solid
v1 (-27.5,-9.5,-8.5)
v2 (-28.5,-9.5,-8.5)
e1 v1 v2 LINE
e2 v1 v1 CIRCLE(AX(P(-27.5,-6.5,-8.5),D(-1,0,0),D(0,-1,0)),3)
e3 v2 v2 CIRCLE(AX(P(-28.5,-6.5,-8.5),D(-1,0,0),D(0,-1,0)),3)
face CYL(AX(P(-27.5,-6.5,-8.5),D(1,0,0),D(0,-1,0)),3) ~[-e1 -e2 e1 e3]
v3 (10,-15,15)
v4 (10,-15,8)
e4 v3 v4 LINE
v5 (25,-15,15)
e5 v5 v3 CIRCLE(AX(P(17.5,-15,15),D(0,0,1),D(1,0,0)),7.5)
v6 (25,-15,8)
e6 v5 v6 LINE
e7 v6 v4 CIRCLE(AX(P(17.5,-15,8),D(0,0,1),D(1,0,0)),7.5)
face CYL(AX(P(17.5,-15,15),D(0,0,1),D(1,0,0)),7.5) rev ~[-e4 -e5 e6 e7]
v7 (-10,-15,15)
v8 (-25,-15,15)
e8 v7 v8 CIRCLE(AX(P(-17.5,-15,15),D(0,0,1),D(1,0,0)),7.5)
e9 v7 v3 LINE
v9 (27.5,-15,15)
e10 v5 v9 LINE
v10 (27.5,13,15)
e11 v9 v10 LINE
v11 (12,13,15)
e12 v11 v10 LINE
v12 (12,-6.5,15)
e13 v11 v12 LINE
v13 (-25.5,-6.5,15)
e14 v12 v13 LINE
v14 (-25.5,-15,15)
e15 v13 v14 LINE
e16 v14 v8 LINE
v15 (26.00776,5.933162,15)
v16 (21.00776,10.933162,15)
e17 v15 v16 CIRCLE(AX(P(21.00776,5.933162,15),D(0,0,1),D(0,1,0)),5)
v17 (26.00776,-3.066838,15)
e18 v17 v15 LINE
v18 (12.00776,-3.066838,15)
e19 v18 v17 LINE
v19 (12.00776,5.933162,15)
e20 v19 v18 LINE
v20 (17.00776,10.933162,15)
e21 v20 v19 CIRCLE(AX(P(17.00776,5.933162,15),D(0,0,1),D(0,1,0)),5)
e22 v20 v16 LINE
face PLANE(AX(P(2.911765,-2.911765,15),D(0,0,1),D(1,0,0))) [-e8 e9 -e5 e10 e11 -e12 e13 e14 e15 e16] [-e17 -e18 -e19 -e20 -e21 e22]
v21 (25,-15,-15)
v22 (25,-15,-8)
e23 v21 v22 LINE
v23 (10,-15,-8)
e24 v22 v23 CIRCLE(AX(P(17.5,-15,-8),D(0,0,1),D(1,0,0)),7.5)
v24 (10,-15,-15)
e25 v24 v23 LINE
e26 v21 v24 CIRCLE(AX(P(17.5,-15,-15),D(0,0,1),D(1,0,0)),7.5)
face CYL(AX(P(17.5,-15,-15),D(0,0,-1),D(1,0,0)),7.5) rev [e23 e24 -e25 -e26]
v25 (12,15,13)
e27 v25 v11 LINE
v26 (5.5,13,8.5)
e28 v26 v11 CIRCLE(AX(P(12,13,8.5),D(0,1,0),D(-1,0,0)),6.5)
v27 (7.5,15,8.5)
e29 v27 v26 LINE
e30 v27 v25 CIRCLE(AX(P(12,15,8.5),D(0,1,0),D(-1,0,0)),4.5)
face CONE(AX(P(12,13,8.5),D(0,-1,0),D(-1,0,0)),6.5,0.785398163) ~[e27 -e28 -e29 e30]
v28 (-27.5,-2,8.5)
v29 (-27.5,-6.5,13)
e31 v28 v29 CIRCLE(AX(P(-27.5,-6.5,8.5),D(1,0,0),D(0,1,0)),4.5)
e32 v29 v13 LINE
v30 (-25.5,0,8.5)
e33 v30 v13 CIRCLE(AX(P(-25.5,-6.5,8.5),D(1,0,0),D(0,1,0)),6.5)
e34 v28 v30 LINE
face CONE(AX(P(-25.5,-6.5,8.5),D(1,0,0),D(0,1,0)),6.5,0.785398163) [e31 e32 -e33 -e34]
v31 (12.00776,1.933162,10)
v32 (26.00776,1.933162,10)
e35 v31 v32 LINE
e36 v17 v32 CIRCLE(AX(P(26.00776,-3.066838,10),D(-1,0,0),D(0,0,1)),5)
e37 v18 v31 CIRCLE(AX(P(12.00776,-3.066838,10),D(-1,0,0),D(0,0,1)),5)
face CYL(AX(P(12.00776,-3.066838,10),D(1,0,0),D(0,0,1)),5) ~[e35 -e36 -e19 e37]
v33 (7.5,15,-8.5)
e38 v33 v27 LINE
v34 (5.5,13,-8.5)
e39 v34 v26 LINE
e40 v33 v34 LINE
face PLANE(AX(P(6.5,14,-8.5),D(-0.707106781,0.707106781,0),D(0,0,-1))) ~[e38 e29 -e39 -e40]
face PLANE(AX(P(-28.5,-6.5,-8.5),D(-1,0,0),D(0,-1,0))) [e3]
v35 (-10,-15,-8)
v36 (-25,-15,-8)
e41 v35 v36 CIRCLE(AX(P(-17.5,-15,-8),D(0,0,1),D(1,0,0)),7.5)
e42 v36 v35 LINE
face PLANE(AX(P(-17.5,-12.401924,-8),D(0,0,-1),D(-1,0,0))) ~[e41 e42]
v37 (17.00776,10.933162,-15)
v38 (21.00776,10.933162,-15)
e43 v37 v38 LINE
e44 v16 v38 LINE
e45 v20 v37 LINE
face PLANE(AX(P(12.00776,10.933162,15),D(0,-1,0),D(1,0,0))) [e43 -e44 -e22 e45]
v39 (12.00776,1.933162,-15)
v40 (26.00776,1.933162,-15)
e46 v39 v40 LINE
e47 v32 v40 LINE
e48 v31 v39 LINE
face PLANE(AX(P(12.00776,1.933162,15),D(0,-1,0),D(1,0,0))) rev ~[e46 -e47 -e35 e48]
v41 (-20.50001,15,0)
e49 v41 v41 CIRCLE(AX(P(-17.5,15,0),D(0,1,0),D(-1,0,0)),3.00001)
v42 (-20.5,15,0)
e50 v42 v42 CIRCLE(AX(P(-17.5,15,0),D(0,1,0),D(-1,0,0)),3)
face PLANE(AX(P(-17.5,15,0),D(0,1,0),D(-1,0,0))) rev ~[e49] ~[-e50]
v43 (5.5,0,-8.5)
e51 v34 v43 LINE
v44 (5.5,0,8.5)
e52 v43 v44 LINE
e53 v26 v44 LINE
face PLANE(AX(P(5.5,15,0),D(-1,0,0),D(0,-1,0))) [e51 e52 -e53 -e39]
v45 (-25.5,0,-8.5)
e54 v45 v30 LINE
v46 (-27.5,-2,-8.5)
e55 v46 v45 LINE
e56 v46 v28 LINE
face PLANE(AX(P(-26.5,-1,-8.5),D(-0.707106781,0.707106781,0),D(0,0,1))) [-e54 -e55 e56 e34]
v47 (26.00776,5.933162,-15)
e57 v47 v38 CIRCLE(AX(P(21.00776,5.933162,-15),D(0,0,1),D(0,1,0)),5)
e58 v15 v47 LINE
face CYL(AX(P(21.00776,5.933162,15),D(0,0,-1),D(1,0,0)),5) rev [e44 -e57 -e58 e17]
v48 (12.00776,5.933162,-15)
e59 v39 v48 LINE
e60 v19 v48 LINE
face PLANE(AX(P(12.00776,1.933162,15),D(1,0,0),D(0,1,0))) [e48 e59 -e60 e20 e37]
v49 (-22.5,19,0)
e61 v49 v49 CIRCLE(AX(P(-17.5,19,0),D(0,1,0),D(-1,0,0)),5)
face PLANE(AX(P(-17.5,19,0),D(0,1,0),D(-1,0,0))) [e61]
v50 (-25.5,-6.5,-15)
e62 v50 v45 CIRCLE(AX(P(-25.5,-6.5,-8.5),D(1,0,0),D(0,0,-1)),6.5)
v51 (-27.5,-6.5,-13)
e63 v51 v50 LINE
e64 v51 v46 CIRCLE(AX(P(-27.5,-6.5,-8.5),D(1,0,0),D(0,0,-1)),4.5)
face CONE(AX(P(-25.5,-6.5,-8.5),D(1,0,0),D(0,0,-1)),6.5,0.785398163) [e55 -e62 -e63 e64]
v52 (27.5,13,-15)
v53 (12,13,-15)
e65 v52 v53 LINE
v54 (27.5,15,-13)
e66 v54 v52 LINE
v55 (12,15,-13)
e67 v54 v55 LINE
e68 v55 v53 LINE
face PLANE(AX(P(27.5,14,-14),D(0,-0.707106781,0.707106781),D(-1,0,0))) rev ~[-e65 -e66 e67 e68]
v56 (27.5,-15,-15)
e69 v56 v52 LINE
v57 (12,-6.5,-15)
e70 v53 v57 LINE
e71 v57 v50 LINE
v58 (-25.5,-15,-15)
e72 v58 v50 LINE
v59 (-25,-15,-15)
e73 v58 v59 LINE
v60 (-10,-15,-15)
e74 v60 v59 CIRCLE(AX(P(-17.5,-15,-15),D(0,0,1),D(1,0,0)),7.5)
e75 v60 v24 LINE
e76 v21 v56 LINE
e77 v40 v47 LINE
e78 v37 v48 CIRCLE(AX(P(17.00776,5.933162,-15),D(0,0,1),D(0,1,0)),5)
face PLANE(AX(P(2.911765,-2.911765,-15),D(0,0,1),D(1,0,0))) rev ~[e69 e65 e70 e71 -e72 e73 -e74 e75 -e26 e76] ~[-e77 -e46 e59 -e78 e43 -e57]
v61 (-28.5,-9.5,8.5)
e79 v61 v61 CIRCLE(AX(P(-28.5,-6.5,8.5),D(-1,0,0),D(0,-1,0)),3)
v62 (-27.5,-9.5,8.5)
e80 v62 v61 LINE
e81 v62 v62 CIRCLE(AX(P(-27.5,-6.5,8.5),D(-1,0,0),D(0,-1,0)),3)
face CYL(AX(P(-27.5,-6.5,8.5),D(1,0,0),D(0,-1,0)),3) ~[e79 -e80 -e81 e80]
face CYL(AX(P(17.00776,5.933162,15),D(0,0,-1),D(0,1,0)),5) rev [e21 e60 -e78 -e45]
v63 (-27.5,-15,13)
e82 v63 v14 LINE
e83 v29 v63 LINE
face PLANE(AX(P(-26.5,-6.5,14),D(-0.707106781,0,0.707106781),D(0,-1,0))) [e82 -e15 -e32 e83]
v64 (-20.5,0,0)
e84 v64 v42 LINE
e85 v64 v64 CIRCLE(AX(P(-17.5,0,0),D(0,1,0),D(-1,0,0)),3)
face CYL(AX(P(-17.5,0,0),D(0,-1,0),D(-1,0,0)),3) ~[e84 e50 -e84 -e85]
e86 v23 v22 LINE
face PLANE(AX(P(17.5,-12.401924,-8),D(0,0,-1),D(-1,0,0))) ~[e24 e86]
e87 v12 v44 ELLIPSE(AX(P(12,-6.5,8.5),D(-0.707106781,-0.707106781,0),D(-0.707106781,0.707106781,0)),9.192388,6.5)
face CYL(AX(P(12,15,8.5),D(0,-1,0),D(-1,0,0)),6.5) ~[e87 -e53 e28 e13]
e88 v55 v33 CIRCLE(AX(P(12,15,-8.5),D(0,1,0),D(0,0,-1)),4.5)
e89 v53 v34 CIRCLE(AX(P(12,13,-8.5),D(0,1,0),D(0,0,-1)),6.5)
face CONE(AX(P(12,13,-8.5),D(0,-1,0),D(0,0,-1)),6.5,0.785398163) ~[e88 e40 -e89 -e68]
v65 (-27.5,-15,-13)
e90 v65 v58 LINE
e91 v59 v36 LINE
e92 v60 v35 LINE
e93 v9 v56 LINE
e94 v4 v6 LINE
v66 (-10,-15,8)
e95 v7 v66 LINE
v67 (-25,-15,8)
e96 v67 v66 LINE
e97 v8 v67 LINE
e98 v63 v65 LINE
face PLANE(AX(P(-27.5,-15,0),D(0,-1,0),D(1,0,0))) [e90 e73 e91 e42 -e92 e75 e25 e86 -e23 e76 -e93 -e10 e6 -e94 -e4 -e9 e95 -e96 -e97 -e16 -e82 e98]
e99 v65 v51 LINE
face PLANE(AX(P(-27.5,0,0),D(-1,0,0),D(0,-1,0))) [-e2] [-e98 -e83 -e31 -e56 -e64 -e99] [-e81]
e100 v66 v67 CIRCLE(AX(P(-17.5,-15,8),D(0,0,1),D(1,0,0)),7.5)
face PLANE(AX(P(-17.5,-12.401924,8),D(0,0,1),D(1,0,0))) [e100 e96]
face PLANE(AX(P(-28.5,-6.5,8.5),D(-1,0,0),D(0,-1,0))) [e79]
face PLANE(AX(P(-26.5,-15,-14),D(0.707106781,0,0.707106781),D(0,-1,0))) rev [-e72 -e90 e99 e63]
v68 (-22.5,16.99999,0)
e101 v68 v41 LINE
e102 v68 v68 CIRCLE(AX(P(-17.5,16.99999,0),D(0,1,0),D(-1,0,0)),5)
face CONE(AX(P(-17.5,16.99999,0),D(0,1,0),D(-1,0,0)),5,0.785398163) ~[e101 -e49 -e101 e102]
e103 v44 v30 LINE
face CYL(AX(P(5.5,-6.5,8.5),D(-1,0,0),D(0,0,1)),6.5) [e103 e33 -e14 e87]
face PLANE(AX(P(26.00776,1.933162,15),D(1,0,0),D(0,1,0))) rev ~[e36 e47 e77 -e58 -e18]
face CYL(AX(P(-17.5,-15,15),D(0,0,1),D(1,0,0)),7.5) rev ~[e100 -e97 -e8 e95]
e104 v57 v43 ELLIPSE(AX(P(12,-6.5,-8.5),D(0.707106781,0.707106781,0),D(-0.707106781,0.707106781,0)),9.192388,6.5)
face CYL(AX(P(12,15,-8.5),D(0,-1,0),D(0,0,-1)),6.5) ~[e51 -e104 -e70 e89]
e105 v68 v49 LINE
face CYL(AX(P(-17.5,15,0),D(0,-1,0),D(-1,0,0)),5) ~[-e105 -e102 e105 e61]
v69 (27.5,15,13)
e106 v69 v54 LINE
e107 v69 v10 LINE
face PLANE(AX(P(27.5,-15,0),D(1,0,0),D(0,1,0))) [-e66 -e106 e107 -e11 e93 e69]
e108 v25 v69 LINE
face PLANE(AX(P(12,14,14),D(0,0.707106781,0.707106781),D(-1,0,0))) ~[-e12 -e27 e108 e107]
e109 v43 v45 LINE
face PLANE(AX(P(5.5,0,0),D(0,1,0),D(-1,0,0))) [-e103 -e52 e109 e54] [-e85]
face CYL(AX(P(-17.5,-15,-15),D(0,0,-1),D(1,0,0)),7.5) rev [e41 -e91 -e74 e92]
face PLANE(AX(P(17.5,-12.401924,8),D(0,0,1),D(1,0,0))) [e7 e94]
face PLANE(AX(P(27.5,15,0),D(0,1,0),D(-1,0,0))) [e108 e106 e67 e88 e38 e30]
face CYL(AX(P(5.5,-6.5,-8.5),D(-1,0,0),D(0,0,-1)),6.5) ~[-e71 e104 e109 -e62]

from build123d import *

# Parameters (mm, degrees)
F1_DEPTH  = 15
F3_DEPTH  = 7
F4_R      = 6.5
F5_SIZE   = 2
F6_W      = 14
F6_H      = 9
F7_DEPTH  = 30.001
F8_R      = 5
F9_R      = 3
F10_DEPTH = 1
F11_R     = 3
F12_DEPTH = 15
F13_R     = 5
F14_DEPTH = 4
F15_SIZE  = 1.99999


# Not quite as in the source:
# - a fillet or chamfer is up to 0.001 mm smaller than in the source, because OpenCascade refuses the exact size
# - a pattern or mirror of a feature is missing from the dataset's text; its kind, count and spacing are read off the source's solid


with BuildPart() as f1:
    # F0 (on Top) → F1 (new body, symmetric)
    with BuildSketch(Plane.XY):
        Polygon((27.5, 15), (5.5, 15), (5.5, 0), (-27.5, 0), (-27.5, -15), (27.5, -15), align=None)
    extrude(amount=F1_DEPTH, both=True)

    # F2 (on face) → F3 (cut)
    with BuildSketch(Plane.XY.offset(15)):
        with BuildLine():
            Line((-25, -15), (-10, -15))
            ThreePointArc((-10, -15), (-17.5, -7.5), (-25, -15))
        make_face()
        with BuildLine():
            ThreePointArc((25, -15), (17.5, -7.5), (10, -15))
            Line((10, -15), (25, -15))
        make_face()
    f3 = extrude(amount=-F3_DEPTH, mode=Mode.SUBTRACT)

    # F3_copies: F3 across plane
    add(f3.mirror(Plane(origin=(0, 0, 0), x_dir=(-1, 0, 0), z_dir=(0, 0, -1))), mode=Mode.SUBTRACT)

    # F4
    f4_edges = [f1.edges().sort_by_distance(p)[0] for p in [
        (-11, 0, 15),
        (-11, 0, -15),
        (5.5, 7.5, 15),
        (5.5, 7.5, -15),
    ]]
    fillet(f4_edges, radius=F4_R)

    # F5
    f5_edges = [f1.edges().sort_by_distance(p)[0] for p in [
        (5.5, 15, 0),
        (-27.5, 0, 0),
    ]]
    chamfer(f5_edges, length=F5_SIZE)

    # F6 (on face) → F7 (cut, through all)
    with BuildSketch(Plane.XY.offset(15)):
        with Locations((19.0077603161, 6.4331619842)):
            Rectangle(F6_W, F6_H)
    extrude(amount=-F7_DEPTH, mode=Mode.SUBTRACT)

    # F8
    f8_edges = [f1.edges().sort_by_distance(p)[0] for p in [
        (19.00776, 1.933162, 15),
        (26.00776, 10.933162, 0),
        (12.00776, 10.933162, 0),
    ]]
    fillet(f8_edges, radius=F8_R)

    # F9 (on face) → F10 (join)
    with BuildSketch(Plane(origin=(-27.5, 0, 0), x_dir=(0, -1, 0), z_dir=(-1, 0, 0))):
        with Locations((6.5, 8.5)):
            Circle(F9_R)
        with Locations((6.5, -8.5)):
            Circle(F9_R)
    extrude(amount=F10_DEPTH)

    # F11 (on face) → F12 (join)
    with BuildSketch(Plane(origin=(0, 0, 0), x_dir=(-1, 0, 0), z_dir=(0, 1, 0))):
        with Locations((17.5, 0)):
            Circle(F11_R)
    extrude(amount=F12_DEPTH)

    # F13 (on face) → F14 (join)
    with BuildSketch(Plane(origin=(0, 15, 0), x_dir=(-1, 0, 0), z_dir=(0, 1, 0))):
        with Locations((17.5, 0)):
            Circle(F13_R)
    extrude(amount=F14_DEPTH)

    # F15 (size 2 in the source; OpenCascade refuses exactly that, so slightly less here)
    f15_edges = [f1.edges().sort_by_distance(p)[0] for p in [
        (-12.5, 15, 0),
    ]]
    chamfer(f15_edges, length=F15_SIZE)


solid = f1.part
